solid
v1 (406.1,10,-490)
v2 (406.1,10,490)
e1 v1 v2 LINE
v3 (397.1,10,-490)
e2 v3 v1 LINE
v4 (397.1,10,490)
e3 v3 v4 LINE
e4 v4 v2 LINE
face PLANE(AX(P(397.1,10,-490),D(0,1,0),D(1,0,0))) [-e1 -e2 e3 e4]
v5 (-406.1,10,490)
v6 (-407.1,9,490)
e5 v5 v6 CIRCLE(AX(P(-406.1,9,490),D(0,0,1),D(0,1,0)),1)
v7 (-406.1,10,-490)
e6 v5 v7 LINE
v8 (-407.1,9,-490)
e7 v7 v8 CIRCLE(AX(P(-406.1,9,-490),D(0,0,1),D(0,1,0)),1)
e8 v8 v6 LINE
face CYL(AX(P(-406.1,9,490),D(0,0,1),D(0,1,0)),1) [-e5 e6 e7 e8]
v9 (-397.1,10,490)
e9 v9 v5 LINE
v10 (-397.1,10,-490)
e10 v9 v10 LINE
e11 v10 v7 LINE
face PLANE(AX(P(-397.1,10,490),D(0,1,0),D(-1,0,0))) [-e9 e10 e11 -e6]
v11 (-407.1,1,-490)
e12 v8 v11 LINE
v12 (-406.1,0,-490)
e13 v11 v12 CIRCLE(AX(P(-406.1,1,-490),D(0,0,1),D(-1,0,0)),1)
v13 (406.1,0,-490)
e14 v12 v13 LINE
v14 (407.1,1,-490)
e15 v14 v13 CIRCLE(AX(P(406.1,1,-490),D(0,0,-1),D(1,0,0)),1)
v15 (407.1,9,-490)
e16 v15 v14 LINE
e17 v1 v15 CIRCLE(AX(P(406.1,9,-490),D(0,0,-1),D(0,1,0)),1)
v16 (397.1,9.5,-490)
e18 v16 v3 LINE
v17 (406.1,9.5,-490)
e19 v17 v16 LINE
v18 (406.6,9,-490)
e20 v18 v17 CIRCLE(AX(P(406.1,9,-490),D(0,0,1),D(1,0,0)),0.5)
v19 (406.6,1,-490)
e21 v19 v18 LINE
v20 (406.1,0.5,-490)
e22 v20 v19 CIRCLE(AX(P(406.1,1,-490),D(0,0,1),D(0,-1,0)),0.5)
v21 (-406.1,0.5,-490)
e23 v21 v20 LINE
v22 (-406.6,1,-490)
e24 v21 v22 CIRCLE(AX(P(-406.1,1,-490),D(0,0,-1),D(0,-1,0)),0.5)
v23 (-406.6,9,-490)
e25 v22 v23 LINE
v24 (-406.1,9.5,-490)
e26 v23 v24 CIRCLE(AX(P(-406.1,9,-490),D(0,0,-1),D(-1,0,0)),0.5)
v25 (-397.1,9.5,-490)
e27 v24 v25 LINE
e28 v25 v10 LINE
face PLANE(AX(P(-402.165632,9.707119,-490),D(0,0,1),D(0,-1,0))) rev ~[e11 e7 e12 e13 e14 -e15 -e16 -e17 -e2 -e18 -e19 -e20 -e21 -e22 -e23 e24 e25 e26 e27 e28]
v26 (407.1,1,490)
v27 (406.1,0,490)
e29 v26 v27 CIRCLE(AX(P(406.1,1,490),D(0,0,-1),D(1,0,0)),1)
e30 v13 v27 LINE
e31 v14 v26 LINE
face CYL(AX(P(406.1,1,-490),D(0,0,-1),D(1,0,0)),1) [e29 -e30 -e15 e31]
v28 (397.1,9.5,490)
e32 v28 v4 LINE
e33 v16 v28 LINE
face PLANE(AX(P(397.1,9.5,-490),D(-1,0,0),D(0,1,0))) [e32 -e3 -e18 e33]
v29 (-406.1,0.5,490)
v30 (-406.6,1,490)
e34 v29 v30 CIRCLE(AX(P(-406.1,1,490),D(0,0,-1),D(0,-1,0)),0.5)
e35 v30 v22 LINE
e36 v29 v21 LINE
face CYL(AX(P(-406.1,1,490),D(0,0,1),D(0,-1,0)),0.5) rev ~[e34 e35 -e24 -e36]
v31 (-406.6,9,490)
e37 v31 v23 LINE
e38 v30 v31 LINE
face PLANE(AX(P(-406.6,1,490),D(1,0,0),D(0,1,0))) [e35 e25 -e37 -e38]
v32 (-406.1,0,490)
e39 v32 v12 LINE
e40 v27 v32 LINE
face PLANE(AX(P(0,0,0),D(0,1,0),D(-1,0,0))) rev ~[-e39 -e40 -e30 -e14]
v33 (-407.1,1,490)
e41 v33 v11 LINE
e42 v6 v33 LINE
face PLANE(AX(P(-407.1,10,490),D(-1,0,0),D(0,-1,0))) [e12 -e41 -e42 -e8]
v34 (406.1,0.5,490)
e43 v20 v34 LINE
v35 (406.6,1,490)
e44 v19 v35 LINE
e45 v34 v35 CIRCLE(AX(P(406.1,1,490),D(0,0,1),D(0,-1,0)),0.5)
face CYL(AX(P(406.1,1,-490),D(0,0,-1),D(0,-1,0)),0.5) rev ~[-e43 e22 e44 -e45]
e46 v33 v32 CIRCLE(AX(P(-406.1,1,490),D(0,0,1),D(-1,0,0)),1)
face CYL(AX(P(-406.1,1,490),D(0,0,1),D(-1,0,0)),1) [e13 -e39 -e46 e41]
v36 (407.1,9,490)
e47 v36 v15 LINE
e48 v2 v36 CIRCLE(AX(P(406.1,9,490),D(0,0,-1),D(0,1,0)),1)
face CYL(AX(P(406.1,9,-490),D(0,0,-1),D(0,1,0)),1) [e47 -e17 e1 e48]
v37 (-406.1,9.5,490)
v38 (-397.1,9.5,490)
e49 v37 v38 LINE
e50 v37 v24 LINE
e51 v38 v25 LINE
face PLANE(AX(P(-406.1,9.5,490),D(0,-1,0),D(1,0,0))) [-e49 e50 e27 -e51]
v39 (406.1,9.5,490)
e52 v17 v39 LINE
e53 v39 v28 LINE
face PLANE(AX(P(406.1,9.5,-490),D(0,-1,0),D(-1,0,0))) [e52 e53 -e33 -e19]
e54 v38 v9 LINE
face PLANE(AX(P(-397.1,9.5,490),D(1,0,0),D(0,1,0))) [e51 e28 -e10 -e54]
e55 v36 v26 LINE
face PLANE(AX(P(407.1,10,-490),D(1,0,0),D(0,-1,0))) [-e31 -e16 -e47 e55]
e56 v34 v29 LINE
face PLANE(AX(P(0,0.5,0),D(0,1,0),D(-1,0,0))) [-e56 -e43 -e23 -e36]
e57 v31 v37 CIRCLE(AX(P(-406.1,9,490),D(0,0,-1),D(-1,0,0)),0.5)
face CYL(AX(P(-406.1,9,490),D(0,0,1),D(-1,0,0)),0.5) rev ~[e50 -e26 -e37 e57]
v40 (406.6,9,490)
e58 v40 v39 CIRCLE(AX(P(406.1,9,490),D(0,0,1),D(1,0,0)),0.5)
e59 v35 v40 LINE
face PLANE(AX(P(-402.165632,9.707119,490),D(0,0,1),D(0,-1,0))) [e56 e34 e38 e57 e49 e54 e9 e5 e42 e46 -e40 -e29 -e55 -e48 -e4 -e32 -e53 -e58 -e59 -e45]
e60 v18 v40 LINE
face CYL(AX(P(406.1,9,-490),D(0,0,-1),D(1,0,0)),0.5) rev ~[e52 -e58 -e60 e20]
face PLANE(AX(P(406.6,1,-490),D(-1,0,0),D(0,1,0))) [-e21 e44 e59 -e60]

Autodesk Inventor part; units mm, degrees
ref_plane "YZ Plane" through (0, 0, 0) normal (1, 0, 0) x (0, 1, 0)
ref_plane "XZ Plane" through (0, 0, 0) normal (0, 1, 0) x (-1, 0, 0)
ref_plane "XY Plane" through (0, 0, 0) normal (0, 0, 1) x (1, 0, 0)
sketch "Sketch6" plane through (0, 0, 0) normal (0, 1, 0) x (-1, 0, 0)
  line L0 (407.1, -490) -> (-407.1, -490)
  line L1 (-407.1, -490) -> (-407.1, 490)
  line L2 (-407.1, 490) -> (407.1, 490)
  line L3 (407.1, 490) -> (407.1, -490)
  line L4 (407.1, -490) -> (-407.1, 490) construction
  line L5 (-407.1, -490) -> (407.1, 490) construction
  point P0 (0, 0)
  dimension "d52" = 814.2
  dimension "d53" = 980
extrude "Plate2" add sketch "Sketch6" along normal blind 0.5
sketch "Sketch11" plane through (406.6, 0, -490) normal (1, 0, 0) x (0, 1, 0)
  line L0 (0, 980) -> (0, 0)
  line L1 (0, 0) -> (10, 0)
  line L2 (10, 0) -> (10, 980)
  line L3 (10, 980) -> (0, 980)
edge flange "Flange2" height 10 angle 90 thickness 0.5 bend radius 0.5 thickness toward (1, 0, 0) relief tear relief width 0.5 relief depth 0.25 edges at (407.1, 0.5, 0) wall of the first edge with corners at (406.6, 0, 490) (406.6, 0, -490) (406.6, 10, -490) (406.6, 10, 490)
bend "Bend3"
corner "Corner3"
sketch "Sketch12" plane through (407.1, 9.5, -490) normal (0, 1, 0) x (-1, 0, 0)
  line L0 (0, 980) -> (0, 0)
  line L1 (0, 0) -> (10, 0)
  line L2 (10, 0) -> (10, 980)
  line L3 (10, 980) -> (0, 980)
edge flange "Flange3" height 10 angle 90 thickness 0.5 bend radius 0.5 thickness toward (0, 1, 0) relief tear relief width 0.5 relief depth 0.25 edges at (406.6, 10, 0) wall of the first edge with corners at (407.1, 9.5, 490) (407.1, 9.5, -490) (397.1, 9.5, -490) (397.1, 9.5, 490)
bend "Bend4"
corner "Corner4"
sketch "Sketch13" plane through (-406.6, 0, 490) normal (-1, 0, 0) x (0, -1, 0)
  line L0 (0, -980) -> (0, 0)
  line L1 (0, 0) -> (-10, 0)
  line L2 (-10, 0) -> (-10, -980)
  line L3 (-10, -980) -> (0, -980)
edge flange "Flange4" height 10 angle 90 thickness 0.5 bend radius 0.5 thickness toward (-1, 0, 0) relief tear relief width 0.5 relief depth 0.25 edges at (-407.1, 0.5, 0) wall of the first edge with corners at (-406.6, 0, -490) (-406.6, 0, 490) (-406.6, 10, 490) (-406.6, 10, -490)
bend "Bend5"
corner "Corner5"
sketch "Sketch14" plane through (-407.1, 9.5, 490) normal (0, 1, 0) x (-1, 0, 0)
  line L0 (0, -980) -> (0, 0)
  line L1 (0, 0) -> (-10, 0)
  line L2 (-10, 0) -> (-10, -980)
  line L3 (-10, -980) -> (0, -980)
edge flange "Flange5" height 10 angle 90 thickness 0.5 bend radius 0.5 thickness toward (0, 1, 0) relief tear relief width 0.5 relief depth 0.25 edges at (-406.6, 10, 0) wall of the first edge with corners at (-407.1, 9.5, -490) (-407.1, 9.5, 490) (-397.1, 9.5, 490) (-397.1, 9.5, -490)
bend "Bend6"
corner "Corner6"
equation "\"d52\" = ЖАБРЫ_базовая_ширина - ЖАБРЫ_шаг_листов"
equation "\"d53\" = ЖАБРЫ_базовая_длина_кор_лист"
equation "\"d54\" = Thickness"
equation "\"d84\" = BendReliefWidth"
equation "\"d85\" = BendReliefDepth"
equation "\"d86\" = MinimumRemnant"
equation "\"d87\" = TransitionRadius"
equation "\"d90\" = BendRadius"
equation "\"d91\" = CornerReliefSize"
equation "\"d92\" = GapSize"
equation "\"d93\" = JacobiRadiusSize"
equation "\"d94\" = BendReliefWidth"
equation "\"d95\" = BendReliefDepth"
equation "\"d96\" = MinimumRemnant"
equation "\"d97\" = TransitionRadius"
equation "\"d100\" = BendRadius"
equation "\"d101\" = CornerReliefSize"
equation "\"d102\" = GapSize"
equation "\"d103\" = JacobiRadiusSize"
equation "\"d104\" = BendReliefWidth"
equation "\"d105\" = BendReliefDepth"
equation "\"d106\" = MinimumRemnant"
equation "\"d107\" = TransitionRadius"
equation "\"d110\" = BendRadius"
equation "\"d111\" = CornerReliefSize"
equation "\"d112\" = GapSize"
equation "\"d113\" = JacobiRadiusSize"
equation "\"d114\" = BendReliefWidth"
equation "\"d115\" = BendReliefDepth"
equation "\"d116\" = MinimumRemnant"
equation "\"d117\" = TransitionRadius"
equation "\"d120\" = BendRadius"
equation "\"d121\" = CornerReliefSize"
equation "\"d122\" = GapSize"
equation "\"d123\" = JacobiRadiusSize"
equation "\"BendRadius\" = Thickness"
equation "\"BendReliefWidth\" = Thickness"
equation "\"BendReliefDepth\" = 0.5 * Thickness"
equation "\"CornerReliefSize\" = 4 * Thickness"
equation "\"MinimumRemnant\" = 2 * Thickness"
equation "\"TransitionRadius\" = BendRadius"
equation "\"JacobiRadiusSize\" = BendRadius"
equation "\"GapSize\" = Thickness"
equation "\"ЖАБРЫ_базовая_ширина\" = 915"
equation "\"ЖАБРЫ_шаг_листов\" = 100.8"
equation "\"ЖАБРЫ_базовая_длина_кор_лист\" = 980"
equation "\"Thickness\" = 0.5"
properties part number "MSC 803 sheet gills" material "Stainless Steel"
